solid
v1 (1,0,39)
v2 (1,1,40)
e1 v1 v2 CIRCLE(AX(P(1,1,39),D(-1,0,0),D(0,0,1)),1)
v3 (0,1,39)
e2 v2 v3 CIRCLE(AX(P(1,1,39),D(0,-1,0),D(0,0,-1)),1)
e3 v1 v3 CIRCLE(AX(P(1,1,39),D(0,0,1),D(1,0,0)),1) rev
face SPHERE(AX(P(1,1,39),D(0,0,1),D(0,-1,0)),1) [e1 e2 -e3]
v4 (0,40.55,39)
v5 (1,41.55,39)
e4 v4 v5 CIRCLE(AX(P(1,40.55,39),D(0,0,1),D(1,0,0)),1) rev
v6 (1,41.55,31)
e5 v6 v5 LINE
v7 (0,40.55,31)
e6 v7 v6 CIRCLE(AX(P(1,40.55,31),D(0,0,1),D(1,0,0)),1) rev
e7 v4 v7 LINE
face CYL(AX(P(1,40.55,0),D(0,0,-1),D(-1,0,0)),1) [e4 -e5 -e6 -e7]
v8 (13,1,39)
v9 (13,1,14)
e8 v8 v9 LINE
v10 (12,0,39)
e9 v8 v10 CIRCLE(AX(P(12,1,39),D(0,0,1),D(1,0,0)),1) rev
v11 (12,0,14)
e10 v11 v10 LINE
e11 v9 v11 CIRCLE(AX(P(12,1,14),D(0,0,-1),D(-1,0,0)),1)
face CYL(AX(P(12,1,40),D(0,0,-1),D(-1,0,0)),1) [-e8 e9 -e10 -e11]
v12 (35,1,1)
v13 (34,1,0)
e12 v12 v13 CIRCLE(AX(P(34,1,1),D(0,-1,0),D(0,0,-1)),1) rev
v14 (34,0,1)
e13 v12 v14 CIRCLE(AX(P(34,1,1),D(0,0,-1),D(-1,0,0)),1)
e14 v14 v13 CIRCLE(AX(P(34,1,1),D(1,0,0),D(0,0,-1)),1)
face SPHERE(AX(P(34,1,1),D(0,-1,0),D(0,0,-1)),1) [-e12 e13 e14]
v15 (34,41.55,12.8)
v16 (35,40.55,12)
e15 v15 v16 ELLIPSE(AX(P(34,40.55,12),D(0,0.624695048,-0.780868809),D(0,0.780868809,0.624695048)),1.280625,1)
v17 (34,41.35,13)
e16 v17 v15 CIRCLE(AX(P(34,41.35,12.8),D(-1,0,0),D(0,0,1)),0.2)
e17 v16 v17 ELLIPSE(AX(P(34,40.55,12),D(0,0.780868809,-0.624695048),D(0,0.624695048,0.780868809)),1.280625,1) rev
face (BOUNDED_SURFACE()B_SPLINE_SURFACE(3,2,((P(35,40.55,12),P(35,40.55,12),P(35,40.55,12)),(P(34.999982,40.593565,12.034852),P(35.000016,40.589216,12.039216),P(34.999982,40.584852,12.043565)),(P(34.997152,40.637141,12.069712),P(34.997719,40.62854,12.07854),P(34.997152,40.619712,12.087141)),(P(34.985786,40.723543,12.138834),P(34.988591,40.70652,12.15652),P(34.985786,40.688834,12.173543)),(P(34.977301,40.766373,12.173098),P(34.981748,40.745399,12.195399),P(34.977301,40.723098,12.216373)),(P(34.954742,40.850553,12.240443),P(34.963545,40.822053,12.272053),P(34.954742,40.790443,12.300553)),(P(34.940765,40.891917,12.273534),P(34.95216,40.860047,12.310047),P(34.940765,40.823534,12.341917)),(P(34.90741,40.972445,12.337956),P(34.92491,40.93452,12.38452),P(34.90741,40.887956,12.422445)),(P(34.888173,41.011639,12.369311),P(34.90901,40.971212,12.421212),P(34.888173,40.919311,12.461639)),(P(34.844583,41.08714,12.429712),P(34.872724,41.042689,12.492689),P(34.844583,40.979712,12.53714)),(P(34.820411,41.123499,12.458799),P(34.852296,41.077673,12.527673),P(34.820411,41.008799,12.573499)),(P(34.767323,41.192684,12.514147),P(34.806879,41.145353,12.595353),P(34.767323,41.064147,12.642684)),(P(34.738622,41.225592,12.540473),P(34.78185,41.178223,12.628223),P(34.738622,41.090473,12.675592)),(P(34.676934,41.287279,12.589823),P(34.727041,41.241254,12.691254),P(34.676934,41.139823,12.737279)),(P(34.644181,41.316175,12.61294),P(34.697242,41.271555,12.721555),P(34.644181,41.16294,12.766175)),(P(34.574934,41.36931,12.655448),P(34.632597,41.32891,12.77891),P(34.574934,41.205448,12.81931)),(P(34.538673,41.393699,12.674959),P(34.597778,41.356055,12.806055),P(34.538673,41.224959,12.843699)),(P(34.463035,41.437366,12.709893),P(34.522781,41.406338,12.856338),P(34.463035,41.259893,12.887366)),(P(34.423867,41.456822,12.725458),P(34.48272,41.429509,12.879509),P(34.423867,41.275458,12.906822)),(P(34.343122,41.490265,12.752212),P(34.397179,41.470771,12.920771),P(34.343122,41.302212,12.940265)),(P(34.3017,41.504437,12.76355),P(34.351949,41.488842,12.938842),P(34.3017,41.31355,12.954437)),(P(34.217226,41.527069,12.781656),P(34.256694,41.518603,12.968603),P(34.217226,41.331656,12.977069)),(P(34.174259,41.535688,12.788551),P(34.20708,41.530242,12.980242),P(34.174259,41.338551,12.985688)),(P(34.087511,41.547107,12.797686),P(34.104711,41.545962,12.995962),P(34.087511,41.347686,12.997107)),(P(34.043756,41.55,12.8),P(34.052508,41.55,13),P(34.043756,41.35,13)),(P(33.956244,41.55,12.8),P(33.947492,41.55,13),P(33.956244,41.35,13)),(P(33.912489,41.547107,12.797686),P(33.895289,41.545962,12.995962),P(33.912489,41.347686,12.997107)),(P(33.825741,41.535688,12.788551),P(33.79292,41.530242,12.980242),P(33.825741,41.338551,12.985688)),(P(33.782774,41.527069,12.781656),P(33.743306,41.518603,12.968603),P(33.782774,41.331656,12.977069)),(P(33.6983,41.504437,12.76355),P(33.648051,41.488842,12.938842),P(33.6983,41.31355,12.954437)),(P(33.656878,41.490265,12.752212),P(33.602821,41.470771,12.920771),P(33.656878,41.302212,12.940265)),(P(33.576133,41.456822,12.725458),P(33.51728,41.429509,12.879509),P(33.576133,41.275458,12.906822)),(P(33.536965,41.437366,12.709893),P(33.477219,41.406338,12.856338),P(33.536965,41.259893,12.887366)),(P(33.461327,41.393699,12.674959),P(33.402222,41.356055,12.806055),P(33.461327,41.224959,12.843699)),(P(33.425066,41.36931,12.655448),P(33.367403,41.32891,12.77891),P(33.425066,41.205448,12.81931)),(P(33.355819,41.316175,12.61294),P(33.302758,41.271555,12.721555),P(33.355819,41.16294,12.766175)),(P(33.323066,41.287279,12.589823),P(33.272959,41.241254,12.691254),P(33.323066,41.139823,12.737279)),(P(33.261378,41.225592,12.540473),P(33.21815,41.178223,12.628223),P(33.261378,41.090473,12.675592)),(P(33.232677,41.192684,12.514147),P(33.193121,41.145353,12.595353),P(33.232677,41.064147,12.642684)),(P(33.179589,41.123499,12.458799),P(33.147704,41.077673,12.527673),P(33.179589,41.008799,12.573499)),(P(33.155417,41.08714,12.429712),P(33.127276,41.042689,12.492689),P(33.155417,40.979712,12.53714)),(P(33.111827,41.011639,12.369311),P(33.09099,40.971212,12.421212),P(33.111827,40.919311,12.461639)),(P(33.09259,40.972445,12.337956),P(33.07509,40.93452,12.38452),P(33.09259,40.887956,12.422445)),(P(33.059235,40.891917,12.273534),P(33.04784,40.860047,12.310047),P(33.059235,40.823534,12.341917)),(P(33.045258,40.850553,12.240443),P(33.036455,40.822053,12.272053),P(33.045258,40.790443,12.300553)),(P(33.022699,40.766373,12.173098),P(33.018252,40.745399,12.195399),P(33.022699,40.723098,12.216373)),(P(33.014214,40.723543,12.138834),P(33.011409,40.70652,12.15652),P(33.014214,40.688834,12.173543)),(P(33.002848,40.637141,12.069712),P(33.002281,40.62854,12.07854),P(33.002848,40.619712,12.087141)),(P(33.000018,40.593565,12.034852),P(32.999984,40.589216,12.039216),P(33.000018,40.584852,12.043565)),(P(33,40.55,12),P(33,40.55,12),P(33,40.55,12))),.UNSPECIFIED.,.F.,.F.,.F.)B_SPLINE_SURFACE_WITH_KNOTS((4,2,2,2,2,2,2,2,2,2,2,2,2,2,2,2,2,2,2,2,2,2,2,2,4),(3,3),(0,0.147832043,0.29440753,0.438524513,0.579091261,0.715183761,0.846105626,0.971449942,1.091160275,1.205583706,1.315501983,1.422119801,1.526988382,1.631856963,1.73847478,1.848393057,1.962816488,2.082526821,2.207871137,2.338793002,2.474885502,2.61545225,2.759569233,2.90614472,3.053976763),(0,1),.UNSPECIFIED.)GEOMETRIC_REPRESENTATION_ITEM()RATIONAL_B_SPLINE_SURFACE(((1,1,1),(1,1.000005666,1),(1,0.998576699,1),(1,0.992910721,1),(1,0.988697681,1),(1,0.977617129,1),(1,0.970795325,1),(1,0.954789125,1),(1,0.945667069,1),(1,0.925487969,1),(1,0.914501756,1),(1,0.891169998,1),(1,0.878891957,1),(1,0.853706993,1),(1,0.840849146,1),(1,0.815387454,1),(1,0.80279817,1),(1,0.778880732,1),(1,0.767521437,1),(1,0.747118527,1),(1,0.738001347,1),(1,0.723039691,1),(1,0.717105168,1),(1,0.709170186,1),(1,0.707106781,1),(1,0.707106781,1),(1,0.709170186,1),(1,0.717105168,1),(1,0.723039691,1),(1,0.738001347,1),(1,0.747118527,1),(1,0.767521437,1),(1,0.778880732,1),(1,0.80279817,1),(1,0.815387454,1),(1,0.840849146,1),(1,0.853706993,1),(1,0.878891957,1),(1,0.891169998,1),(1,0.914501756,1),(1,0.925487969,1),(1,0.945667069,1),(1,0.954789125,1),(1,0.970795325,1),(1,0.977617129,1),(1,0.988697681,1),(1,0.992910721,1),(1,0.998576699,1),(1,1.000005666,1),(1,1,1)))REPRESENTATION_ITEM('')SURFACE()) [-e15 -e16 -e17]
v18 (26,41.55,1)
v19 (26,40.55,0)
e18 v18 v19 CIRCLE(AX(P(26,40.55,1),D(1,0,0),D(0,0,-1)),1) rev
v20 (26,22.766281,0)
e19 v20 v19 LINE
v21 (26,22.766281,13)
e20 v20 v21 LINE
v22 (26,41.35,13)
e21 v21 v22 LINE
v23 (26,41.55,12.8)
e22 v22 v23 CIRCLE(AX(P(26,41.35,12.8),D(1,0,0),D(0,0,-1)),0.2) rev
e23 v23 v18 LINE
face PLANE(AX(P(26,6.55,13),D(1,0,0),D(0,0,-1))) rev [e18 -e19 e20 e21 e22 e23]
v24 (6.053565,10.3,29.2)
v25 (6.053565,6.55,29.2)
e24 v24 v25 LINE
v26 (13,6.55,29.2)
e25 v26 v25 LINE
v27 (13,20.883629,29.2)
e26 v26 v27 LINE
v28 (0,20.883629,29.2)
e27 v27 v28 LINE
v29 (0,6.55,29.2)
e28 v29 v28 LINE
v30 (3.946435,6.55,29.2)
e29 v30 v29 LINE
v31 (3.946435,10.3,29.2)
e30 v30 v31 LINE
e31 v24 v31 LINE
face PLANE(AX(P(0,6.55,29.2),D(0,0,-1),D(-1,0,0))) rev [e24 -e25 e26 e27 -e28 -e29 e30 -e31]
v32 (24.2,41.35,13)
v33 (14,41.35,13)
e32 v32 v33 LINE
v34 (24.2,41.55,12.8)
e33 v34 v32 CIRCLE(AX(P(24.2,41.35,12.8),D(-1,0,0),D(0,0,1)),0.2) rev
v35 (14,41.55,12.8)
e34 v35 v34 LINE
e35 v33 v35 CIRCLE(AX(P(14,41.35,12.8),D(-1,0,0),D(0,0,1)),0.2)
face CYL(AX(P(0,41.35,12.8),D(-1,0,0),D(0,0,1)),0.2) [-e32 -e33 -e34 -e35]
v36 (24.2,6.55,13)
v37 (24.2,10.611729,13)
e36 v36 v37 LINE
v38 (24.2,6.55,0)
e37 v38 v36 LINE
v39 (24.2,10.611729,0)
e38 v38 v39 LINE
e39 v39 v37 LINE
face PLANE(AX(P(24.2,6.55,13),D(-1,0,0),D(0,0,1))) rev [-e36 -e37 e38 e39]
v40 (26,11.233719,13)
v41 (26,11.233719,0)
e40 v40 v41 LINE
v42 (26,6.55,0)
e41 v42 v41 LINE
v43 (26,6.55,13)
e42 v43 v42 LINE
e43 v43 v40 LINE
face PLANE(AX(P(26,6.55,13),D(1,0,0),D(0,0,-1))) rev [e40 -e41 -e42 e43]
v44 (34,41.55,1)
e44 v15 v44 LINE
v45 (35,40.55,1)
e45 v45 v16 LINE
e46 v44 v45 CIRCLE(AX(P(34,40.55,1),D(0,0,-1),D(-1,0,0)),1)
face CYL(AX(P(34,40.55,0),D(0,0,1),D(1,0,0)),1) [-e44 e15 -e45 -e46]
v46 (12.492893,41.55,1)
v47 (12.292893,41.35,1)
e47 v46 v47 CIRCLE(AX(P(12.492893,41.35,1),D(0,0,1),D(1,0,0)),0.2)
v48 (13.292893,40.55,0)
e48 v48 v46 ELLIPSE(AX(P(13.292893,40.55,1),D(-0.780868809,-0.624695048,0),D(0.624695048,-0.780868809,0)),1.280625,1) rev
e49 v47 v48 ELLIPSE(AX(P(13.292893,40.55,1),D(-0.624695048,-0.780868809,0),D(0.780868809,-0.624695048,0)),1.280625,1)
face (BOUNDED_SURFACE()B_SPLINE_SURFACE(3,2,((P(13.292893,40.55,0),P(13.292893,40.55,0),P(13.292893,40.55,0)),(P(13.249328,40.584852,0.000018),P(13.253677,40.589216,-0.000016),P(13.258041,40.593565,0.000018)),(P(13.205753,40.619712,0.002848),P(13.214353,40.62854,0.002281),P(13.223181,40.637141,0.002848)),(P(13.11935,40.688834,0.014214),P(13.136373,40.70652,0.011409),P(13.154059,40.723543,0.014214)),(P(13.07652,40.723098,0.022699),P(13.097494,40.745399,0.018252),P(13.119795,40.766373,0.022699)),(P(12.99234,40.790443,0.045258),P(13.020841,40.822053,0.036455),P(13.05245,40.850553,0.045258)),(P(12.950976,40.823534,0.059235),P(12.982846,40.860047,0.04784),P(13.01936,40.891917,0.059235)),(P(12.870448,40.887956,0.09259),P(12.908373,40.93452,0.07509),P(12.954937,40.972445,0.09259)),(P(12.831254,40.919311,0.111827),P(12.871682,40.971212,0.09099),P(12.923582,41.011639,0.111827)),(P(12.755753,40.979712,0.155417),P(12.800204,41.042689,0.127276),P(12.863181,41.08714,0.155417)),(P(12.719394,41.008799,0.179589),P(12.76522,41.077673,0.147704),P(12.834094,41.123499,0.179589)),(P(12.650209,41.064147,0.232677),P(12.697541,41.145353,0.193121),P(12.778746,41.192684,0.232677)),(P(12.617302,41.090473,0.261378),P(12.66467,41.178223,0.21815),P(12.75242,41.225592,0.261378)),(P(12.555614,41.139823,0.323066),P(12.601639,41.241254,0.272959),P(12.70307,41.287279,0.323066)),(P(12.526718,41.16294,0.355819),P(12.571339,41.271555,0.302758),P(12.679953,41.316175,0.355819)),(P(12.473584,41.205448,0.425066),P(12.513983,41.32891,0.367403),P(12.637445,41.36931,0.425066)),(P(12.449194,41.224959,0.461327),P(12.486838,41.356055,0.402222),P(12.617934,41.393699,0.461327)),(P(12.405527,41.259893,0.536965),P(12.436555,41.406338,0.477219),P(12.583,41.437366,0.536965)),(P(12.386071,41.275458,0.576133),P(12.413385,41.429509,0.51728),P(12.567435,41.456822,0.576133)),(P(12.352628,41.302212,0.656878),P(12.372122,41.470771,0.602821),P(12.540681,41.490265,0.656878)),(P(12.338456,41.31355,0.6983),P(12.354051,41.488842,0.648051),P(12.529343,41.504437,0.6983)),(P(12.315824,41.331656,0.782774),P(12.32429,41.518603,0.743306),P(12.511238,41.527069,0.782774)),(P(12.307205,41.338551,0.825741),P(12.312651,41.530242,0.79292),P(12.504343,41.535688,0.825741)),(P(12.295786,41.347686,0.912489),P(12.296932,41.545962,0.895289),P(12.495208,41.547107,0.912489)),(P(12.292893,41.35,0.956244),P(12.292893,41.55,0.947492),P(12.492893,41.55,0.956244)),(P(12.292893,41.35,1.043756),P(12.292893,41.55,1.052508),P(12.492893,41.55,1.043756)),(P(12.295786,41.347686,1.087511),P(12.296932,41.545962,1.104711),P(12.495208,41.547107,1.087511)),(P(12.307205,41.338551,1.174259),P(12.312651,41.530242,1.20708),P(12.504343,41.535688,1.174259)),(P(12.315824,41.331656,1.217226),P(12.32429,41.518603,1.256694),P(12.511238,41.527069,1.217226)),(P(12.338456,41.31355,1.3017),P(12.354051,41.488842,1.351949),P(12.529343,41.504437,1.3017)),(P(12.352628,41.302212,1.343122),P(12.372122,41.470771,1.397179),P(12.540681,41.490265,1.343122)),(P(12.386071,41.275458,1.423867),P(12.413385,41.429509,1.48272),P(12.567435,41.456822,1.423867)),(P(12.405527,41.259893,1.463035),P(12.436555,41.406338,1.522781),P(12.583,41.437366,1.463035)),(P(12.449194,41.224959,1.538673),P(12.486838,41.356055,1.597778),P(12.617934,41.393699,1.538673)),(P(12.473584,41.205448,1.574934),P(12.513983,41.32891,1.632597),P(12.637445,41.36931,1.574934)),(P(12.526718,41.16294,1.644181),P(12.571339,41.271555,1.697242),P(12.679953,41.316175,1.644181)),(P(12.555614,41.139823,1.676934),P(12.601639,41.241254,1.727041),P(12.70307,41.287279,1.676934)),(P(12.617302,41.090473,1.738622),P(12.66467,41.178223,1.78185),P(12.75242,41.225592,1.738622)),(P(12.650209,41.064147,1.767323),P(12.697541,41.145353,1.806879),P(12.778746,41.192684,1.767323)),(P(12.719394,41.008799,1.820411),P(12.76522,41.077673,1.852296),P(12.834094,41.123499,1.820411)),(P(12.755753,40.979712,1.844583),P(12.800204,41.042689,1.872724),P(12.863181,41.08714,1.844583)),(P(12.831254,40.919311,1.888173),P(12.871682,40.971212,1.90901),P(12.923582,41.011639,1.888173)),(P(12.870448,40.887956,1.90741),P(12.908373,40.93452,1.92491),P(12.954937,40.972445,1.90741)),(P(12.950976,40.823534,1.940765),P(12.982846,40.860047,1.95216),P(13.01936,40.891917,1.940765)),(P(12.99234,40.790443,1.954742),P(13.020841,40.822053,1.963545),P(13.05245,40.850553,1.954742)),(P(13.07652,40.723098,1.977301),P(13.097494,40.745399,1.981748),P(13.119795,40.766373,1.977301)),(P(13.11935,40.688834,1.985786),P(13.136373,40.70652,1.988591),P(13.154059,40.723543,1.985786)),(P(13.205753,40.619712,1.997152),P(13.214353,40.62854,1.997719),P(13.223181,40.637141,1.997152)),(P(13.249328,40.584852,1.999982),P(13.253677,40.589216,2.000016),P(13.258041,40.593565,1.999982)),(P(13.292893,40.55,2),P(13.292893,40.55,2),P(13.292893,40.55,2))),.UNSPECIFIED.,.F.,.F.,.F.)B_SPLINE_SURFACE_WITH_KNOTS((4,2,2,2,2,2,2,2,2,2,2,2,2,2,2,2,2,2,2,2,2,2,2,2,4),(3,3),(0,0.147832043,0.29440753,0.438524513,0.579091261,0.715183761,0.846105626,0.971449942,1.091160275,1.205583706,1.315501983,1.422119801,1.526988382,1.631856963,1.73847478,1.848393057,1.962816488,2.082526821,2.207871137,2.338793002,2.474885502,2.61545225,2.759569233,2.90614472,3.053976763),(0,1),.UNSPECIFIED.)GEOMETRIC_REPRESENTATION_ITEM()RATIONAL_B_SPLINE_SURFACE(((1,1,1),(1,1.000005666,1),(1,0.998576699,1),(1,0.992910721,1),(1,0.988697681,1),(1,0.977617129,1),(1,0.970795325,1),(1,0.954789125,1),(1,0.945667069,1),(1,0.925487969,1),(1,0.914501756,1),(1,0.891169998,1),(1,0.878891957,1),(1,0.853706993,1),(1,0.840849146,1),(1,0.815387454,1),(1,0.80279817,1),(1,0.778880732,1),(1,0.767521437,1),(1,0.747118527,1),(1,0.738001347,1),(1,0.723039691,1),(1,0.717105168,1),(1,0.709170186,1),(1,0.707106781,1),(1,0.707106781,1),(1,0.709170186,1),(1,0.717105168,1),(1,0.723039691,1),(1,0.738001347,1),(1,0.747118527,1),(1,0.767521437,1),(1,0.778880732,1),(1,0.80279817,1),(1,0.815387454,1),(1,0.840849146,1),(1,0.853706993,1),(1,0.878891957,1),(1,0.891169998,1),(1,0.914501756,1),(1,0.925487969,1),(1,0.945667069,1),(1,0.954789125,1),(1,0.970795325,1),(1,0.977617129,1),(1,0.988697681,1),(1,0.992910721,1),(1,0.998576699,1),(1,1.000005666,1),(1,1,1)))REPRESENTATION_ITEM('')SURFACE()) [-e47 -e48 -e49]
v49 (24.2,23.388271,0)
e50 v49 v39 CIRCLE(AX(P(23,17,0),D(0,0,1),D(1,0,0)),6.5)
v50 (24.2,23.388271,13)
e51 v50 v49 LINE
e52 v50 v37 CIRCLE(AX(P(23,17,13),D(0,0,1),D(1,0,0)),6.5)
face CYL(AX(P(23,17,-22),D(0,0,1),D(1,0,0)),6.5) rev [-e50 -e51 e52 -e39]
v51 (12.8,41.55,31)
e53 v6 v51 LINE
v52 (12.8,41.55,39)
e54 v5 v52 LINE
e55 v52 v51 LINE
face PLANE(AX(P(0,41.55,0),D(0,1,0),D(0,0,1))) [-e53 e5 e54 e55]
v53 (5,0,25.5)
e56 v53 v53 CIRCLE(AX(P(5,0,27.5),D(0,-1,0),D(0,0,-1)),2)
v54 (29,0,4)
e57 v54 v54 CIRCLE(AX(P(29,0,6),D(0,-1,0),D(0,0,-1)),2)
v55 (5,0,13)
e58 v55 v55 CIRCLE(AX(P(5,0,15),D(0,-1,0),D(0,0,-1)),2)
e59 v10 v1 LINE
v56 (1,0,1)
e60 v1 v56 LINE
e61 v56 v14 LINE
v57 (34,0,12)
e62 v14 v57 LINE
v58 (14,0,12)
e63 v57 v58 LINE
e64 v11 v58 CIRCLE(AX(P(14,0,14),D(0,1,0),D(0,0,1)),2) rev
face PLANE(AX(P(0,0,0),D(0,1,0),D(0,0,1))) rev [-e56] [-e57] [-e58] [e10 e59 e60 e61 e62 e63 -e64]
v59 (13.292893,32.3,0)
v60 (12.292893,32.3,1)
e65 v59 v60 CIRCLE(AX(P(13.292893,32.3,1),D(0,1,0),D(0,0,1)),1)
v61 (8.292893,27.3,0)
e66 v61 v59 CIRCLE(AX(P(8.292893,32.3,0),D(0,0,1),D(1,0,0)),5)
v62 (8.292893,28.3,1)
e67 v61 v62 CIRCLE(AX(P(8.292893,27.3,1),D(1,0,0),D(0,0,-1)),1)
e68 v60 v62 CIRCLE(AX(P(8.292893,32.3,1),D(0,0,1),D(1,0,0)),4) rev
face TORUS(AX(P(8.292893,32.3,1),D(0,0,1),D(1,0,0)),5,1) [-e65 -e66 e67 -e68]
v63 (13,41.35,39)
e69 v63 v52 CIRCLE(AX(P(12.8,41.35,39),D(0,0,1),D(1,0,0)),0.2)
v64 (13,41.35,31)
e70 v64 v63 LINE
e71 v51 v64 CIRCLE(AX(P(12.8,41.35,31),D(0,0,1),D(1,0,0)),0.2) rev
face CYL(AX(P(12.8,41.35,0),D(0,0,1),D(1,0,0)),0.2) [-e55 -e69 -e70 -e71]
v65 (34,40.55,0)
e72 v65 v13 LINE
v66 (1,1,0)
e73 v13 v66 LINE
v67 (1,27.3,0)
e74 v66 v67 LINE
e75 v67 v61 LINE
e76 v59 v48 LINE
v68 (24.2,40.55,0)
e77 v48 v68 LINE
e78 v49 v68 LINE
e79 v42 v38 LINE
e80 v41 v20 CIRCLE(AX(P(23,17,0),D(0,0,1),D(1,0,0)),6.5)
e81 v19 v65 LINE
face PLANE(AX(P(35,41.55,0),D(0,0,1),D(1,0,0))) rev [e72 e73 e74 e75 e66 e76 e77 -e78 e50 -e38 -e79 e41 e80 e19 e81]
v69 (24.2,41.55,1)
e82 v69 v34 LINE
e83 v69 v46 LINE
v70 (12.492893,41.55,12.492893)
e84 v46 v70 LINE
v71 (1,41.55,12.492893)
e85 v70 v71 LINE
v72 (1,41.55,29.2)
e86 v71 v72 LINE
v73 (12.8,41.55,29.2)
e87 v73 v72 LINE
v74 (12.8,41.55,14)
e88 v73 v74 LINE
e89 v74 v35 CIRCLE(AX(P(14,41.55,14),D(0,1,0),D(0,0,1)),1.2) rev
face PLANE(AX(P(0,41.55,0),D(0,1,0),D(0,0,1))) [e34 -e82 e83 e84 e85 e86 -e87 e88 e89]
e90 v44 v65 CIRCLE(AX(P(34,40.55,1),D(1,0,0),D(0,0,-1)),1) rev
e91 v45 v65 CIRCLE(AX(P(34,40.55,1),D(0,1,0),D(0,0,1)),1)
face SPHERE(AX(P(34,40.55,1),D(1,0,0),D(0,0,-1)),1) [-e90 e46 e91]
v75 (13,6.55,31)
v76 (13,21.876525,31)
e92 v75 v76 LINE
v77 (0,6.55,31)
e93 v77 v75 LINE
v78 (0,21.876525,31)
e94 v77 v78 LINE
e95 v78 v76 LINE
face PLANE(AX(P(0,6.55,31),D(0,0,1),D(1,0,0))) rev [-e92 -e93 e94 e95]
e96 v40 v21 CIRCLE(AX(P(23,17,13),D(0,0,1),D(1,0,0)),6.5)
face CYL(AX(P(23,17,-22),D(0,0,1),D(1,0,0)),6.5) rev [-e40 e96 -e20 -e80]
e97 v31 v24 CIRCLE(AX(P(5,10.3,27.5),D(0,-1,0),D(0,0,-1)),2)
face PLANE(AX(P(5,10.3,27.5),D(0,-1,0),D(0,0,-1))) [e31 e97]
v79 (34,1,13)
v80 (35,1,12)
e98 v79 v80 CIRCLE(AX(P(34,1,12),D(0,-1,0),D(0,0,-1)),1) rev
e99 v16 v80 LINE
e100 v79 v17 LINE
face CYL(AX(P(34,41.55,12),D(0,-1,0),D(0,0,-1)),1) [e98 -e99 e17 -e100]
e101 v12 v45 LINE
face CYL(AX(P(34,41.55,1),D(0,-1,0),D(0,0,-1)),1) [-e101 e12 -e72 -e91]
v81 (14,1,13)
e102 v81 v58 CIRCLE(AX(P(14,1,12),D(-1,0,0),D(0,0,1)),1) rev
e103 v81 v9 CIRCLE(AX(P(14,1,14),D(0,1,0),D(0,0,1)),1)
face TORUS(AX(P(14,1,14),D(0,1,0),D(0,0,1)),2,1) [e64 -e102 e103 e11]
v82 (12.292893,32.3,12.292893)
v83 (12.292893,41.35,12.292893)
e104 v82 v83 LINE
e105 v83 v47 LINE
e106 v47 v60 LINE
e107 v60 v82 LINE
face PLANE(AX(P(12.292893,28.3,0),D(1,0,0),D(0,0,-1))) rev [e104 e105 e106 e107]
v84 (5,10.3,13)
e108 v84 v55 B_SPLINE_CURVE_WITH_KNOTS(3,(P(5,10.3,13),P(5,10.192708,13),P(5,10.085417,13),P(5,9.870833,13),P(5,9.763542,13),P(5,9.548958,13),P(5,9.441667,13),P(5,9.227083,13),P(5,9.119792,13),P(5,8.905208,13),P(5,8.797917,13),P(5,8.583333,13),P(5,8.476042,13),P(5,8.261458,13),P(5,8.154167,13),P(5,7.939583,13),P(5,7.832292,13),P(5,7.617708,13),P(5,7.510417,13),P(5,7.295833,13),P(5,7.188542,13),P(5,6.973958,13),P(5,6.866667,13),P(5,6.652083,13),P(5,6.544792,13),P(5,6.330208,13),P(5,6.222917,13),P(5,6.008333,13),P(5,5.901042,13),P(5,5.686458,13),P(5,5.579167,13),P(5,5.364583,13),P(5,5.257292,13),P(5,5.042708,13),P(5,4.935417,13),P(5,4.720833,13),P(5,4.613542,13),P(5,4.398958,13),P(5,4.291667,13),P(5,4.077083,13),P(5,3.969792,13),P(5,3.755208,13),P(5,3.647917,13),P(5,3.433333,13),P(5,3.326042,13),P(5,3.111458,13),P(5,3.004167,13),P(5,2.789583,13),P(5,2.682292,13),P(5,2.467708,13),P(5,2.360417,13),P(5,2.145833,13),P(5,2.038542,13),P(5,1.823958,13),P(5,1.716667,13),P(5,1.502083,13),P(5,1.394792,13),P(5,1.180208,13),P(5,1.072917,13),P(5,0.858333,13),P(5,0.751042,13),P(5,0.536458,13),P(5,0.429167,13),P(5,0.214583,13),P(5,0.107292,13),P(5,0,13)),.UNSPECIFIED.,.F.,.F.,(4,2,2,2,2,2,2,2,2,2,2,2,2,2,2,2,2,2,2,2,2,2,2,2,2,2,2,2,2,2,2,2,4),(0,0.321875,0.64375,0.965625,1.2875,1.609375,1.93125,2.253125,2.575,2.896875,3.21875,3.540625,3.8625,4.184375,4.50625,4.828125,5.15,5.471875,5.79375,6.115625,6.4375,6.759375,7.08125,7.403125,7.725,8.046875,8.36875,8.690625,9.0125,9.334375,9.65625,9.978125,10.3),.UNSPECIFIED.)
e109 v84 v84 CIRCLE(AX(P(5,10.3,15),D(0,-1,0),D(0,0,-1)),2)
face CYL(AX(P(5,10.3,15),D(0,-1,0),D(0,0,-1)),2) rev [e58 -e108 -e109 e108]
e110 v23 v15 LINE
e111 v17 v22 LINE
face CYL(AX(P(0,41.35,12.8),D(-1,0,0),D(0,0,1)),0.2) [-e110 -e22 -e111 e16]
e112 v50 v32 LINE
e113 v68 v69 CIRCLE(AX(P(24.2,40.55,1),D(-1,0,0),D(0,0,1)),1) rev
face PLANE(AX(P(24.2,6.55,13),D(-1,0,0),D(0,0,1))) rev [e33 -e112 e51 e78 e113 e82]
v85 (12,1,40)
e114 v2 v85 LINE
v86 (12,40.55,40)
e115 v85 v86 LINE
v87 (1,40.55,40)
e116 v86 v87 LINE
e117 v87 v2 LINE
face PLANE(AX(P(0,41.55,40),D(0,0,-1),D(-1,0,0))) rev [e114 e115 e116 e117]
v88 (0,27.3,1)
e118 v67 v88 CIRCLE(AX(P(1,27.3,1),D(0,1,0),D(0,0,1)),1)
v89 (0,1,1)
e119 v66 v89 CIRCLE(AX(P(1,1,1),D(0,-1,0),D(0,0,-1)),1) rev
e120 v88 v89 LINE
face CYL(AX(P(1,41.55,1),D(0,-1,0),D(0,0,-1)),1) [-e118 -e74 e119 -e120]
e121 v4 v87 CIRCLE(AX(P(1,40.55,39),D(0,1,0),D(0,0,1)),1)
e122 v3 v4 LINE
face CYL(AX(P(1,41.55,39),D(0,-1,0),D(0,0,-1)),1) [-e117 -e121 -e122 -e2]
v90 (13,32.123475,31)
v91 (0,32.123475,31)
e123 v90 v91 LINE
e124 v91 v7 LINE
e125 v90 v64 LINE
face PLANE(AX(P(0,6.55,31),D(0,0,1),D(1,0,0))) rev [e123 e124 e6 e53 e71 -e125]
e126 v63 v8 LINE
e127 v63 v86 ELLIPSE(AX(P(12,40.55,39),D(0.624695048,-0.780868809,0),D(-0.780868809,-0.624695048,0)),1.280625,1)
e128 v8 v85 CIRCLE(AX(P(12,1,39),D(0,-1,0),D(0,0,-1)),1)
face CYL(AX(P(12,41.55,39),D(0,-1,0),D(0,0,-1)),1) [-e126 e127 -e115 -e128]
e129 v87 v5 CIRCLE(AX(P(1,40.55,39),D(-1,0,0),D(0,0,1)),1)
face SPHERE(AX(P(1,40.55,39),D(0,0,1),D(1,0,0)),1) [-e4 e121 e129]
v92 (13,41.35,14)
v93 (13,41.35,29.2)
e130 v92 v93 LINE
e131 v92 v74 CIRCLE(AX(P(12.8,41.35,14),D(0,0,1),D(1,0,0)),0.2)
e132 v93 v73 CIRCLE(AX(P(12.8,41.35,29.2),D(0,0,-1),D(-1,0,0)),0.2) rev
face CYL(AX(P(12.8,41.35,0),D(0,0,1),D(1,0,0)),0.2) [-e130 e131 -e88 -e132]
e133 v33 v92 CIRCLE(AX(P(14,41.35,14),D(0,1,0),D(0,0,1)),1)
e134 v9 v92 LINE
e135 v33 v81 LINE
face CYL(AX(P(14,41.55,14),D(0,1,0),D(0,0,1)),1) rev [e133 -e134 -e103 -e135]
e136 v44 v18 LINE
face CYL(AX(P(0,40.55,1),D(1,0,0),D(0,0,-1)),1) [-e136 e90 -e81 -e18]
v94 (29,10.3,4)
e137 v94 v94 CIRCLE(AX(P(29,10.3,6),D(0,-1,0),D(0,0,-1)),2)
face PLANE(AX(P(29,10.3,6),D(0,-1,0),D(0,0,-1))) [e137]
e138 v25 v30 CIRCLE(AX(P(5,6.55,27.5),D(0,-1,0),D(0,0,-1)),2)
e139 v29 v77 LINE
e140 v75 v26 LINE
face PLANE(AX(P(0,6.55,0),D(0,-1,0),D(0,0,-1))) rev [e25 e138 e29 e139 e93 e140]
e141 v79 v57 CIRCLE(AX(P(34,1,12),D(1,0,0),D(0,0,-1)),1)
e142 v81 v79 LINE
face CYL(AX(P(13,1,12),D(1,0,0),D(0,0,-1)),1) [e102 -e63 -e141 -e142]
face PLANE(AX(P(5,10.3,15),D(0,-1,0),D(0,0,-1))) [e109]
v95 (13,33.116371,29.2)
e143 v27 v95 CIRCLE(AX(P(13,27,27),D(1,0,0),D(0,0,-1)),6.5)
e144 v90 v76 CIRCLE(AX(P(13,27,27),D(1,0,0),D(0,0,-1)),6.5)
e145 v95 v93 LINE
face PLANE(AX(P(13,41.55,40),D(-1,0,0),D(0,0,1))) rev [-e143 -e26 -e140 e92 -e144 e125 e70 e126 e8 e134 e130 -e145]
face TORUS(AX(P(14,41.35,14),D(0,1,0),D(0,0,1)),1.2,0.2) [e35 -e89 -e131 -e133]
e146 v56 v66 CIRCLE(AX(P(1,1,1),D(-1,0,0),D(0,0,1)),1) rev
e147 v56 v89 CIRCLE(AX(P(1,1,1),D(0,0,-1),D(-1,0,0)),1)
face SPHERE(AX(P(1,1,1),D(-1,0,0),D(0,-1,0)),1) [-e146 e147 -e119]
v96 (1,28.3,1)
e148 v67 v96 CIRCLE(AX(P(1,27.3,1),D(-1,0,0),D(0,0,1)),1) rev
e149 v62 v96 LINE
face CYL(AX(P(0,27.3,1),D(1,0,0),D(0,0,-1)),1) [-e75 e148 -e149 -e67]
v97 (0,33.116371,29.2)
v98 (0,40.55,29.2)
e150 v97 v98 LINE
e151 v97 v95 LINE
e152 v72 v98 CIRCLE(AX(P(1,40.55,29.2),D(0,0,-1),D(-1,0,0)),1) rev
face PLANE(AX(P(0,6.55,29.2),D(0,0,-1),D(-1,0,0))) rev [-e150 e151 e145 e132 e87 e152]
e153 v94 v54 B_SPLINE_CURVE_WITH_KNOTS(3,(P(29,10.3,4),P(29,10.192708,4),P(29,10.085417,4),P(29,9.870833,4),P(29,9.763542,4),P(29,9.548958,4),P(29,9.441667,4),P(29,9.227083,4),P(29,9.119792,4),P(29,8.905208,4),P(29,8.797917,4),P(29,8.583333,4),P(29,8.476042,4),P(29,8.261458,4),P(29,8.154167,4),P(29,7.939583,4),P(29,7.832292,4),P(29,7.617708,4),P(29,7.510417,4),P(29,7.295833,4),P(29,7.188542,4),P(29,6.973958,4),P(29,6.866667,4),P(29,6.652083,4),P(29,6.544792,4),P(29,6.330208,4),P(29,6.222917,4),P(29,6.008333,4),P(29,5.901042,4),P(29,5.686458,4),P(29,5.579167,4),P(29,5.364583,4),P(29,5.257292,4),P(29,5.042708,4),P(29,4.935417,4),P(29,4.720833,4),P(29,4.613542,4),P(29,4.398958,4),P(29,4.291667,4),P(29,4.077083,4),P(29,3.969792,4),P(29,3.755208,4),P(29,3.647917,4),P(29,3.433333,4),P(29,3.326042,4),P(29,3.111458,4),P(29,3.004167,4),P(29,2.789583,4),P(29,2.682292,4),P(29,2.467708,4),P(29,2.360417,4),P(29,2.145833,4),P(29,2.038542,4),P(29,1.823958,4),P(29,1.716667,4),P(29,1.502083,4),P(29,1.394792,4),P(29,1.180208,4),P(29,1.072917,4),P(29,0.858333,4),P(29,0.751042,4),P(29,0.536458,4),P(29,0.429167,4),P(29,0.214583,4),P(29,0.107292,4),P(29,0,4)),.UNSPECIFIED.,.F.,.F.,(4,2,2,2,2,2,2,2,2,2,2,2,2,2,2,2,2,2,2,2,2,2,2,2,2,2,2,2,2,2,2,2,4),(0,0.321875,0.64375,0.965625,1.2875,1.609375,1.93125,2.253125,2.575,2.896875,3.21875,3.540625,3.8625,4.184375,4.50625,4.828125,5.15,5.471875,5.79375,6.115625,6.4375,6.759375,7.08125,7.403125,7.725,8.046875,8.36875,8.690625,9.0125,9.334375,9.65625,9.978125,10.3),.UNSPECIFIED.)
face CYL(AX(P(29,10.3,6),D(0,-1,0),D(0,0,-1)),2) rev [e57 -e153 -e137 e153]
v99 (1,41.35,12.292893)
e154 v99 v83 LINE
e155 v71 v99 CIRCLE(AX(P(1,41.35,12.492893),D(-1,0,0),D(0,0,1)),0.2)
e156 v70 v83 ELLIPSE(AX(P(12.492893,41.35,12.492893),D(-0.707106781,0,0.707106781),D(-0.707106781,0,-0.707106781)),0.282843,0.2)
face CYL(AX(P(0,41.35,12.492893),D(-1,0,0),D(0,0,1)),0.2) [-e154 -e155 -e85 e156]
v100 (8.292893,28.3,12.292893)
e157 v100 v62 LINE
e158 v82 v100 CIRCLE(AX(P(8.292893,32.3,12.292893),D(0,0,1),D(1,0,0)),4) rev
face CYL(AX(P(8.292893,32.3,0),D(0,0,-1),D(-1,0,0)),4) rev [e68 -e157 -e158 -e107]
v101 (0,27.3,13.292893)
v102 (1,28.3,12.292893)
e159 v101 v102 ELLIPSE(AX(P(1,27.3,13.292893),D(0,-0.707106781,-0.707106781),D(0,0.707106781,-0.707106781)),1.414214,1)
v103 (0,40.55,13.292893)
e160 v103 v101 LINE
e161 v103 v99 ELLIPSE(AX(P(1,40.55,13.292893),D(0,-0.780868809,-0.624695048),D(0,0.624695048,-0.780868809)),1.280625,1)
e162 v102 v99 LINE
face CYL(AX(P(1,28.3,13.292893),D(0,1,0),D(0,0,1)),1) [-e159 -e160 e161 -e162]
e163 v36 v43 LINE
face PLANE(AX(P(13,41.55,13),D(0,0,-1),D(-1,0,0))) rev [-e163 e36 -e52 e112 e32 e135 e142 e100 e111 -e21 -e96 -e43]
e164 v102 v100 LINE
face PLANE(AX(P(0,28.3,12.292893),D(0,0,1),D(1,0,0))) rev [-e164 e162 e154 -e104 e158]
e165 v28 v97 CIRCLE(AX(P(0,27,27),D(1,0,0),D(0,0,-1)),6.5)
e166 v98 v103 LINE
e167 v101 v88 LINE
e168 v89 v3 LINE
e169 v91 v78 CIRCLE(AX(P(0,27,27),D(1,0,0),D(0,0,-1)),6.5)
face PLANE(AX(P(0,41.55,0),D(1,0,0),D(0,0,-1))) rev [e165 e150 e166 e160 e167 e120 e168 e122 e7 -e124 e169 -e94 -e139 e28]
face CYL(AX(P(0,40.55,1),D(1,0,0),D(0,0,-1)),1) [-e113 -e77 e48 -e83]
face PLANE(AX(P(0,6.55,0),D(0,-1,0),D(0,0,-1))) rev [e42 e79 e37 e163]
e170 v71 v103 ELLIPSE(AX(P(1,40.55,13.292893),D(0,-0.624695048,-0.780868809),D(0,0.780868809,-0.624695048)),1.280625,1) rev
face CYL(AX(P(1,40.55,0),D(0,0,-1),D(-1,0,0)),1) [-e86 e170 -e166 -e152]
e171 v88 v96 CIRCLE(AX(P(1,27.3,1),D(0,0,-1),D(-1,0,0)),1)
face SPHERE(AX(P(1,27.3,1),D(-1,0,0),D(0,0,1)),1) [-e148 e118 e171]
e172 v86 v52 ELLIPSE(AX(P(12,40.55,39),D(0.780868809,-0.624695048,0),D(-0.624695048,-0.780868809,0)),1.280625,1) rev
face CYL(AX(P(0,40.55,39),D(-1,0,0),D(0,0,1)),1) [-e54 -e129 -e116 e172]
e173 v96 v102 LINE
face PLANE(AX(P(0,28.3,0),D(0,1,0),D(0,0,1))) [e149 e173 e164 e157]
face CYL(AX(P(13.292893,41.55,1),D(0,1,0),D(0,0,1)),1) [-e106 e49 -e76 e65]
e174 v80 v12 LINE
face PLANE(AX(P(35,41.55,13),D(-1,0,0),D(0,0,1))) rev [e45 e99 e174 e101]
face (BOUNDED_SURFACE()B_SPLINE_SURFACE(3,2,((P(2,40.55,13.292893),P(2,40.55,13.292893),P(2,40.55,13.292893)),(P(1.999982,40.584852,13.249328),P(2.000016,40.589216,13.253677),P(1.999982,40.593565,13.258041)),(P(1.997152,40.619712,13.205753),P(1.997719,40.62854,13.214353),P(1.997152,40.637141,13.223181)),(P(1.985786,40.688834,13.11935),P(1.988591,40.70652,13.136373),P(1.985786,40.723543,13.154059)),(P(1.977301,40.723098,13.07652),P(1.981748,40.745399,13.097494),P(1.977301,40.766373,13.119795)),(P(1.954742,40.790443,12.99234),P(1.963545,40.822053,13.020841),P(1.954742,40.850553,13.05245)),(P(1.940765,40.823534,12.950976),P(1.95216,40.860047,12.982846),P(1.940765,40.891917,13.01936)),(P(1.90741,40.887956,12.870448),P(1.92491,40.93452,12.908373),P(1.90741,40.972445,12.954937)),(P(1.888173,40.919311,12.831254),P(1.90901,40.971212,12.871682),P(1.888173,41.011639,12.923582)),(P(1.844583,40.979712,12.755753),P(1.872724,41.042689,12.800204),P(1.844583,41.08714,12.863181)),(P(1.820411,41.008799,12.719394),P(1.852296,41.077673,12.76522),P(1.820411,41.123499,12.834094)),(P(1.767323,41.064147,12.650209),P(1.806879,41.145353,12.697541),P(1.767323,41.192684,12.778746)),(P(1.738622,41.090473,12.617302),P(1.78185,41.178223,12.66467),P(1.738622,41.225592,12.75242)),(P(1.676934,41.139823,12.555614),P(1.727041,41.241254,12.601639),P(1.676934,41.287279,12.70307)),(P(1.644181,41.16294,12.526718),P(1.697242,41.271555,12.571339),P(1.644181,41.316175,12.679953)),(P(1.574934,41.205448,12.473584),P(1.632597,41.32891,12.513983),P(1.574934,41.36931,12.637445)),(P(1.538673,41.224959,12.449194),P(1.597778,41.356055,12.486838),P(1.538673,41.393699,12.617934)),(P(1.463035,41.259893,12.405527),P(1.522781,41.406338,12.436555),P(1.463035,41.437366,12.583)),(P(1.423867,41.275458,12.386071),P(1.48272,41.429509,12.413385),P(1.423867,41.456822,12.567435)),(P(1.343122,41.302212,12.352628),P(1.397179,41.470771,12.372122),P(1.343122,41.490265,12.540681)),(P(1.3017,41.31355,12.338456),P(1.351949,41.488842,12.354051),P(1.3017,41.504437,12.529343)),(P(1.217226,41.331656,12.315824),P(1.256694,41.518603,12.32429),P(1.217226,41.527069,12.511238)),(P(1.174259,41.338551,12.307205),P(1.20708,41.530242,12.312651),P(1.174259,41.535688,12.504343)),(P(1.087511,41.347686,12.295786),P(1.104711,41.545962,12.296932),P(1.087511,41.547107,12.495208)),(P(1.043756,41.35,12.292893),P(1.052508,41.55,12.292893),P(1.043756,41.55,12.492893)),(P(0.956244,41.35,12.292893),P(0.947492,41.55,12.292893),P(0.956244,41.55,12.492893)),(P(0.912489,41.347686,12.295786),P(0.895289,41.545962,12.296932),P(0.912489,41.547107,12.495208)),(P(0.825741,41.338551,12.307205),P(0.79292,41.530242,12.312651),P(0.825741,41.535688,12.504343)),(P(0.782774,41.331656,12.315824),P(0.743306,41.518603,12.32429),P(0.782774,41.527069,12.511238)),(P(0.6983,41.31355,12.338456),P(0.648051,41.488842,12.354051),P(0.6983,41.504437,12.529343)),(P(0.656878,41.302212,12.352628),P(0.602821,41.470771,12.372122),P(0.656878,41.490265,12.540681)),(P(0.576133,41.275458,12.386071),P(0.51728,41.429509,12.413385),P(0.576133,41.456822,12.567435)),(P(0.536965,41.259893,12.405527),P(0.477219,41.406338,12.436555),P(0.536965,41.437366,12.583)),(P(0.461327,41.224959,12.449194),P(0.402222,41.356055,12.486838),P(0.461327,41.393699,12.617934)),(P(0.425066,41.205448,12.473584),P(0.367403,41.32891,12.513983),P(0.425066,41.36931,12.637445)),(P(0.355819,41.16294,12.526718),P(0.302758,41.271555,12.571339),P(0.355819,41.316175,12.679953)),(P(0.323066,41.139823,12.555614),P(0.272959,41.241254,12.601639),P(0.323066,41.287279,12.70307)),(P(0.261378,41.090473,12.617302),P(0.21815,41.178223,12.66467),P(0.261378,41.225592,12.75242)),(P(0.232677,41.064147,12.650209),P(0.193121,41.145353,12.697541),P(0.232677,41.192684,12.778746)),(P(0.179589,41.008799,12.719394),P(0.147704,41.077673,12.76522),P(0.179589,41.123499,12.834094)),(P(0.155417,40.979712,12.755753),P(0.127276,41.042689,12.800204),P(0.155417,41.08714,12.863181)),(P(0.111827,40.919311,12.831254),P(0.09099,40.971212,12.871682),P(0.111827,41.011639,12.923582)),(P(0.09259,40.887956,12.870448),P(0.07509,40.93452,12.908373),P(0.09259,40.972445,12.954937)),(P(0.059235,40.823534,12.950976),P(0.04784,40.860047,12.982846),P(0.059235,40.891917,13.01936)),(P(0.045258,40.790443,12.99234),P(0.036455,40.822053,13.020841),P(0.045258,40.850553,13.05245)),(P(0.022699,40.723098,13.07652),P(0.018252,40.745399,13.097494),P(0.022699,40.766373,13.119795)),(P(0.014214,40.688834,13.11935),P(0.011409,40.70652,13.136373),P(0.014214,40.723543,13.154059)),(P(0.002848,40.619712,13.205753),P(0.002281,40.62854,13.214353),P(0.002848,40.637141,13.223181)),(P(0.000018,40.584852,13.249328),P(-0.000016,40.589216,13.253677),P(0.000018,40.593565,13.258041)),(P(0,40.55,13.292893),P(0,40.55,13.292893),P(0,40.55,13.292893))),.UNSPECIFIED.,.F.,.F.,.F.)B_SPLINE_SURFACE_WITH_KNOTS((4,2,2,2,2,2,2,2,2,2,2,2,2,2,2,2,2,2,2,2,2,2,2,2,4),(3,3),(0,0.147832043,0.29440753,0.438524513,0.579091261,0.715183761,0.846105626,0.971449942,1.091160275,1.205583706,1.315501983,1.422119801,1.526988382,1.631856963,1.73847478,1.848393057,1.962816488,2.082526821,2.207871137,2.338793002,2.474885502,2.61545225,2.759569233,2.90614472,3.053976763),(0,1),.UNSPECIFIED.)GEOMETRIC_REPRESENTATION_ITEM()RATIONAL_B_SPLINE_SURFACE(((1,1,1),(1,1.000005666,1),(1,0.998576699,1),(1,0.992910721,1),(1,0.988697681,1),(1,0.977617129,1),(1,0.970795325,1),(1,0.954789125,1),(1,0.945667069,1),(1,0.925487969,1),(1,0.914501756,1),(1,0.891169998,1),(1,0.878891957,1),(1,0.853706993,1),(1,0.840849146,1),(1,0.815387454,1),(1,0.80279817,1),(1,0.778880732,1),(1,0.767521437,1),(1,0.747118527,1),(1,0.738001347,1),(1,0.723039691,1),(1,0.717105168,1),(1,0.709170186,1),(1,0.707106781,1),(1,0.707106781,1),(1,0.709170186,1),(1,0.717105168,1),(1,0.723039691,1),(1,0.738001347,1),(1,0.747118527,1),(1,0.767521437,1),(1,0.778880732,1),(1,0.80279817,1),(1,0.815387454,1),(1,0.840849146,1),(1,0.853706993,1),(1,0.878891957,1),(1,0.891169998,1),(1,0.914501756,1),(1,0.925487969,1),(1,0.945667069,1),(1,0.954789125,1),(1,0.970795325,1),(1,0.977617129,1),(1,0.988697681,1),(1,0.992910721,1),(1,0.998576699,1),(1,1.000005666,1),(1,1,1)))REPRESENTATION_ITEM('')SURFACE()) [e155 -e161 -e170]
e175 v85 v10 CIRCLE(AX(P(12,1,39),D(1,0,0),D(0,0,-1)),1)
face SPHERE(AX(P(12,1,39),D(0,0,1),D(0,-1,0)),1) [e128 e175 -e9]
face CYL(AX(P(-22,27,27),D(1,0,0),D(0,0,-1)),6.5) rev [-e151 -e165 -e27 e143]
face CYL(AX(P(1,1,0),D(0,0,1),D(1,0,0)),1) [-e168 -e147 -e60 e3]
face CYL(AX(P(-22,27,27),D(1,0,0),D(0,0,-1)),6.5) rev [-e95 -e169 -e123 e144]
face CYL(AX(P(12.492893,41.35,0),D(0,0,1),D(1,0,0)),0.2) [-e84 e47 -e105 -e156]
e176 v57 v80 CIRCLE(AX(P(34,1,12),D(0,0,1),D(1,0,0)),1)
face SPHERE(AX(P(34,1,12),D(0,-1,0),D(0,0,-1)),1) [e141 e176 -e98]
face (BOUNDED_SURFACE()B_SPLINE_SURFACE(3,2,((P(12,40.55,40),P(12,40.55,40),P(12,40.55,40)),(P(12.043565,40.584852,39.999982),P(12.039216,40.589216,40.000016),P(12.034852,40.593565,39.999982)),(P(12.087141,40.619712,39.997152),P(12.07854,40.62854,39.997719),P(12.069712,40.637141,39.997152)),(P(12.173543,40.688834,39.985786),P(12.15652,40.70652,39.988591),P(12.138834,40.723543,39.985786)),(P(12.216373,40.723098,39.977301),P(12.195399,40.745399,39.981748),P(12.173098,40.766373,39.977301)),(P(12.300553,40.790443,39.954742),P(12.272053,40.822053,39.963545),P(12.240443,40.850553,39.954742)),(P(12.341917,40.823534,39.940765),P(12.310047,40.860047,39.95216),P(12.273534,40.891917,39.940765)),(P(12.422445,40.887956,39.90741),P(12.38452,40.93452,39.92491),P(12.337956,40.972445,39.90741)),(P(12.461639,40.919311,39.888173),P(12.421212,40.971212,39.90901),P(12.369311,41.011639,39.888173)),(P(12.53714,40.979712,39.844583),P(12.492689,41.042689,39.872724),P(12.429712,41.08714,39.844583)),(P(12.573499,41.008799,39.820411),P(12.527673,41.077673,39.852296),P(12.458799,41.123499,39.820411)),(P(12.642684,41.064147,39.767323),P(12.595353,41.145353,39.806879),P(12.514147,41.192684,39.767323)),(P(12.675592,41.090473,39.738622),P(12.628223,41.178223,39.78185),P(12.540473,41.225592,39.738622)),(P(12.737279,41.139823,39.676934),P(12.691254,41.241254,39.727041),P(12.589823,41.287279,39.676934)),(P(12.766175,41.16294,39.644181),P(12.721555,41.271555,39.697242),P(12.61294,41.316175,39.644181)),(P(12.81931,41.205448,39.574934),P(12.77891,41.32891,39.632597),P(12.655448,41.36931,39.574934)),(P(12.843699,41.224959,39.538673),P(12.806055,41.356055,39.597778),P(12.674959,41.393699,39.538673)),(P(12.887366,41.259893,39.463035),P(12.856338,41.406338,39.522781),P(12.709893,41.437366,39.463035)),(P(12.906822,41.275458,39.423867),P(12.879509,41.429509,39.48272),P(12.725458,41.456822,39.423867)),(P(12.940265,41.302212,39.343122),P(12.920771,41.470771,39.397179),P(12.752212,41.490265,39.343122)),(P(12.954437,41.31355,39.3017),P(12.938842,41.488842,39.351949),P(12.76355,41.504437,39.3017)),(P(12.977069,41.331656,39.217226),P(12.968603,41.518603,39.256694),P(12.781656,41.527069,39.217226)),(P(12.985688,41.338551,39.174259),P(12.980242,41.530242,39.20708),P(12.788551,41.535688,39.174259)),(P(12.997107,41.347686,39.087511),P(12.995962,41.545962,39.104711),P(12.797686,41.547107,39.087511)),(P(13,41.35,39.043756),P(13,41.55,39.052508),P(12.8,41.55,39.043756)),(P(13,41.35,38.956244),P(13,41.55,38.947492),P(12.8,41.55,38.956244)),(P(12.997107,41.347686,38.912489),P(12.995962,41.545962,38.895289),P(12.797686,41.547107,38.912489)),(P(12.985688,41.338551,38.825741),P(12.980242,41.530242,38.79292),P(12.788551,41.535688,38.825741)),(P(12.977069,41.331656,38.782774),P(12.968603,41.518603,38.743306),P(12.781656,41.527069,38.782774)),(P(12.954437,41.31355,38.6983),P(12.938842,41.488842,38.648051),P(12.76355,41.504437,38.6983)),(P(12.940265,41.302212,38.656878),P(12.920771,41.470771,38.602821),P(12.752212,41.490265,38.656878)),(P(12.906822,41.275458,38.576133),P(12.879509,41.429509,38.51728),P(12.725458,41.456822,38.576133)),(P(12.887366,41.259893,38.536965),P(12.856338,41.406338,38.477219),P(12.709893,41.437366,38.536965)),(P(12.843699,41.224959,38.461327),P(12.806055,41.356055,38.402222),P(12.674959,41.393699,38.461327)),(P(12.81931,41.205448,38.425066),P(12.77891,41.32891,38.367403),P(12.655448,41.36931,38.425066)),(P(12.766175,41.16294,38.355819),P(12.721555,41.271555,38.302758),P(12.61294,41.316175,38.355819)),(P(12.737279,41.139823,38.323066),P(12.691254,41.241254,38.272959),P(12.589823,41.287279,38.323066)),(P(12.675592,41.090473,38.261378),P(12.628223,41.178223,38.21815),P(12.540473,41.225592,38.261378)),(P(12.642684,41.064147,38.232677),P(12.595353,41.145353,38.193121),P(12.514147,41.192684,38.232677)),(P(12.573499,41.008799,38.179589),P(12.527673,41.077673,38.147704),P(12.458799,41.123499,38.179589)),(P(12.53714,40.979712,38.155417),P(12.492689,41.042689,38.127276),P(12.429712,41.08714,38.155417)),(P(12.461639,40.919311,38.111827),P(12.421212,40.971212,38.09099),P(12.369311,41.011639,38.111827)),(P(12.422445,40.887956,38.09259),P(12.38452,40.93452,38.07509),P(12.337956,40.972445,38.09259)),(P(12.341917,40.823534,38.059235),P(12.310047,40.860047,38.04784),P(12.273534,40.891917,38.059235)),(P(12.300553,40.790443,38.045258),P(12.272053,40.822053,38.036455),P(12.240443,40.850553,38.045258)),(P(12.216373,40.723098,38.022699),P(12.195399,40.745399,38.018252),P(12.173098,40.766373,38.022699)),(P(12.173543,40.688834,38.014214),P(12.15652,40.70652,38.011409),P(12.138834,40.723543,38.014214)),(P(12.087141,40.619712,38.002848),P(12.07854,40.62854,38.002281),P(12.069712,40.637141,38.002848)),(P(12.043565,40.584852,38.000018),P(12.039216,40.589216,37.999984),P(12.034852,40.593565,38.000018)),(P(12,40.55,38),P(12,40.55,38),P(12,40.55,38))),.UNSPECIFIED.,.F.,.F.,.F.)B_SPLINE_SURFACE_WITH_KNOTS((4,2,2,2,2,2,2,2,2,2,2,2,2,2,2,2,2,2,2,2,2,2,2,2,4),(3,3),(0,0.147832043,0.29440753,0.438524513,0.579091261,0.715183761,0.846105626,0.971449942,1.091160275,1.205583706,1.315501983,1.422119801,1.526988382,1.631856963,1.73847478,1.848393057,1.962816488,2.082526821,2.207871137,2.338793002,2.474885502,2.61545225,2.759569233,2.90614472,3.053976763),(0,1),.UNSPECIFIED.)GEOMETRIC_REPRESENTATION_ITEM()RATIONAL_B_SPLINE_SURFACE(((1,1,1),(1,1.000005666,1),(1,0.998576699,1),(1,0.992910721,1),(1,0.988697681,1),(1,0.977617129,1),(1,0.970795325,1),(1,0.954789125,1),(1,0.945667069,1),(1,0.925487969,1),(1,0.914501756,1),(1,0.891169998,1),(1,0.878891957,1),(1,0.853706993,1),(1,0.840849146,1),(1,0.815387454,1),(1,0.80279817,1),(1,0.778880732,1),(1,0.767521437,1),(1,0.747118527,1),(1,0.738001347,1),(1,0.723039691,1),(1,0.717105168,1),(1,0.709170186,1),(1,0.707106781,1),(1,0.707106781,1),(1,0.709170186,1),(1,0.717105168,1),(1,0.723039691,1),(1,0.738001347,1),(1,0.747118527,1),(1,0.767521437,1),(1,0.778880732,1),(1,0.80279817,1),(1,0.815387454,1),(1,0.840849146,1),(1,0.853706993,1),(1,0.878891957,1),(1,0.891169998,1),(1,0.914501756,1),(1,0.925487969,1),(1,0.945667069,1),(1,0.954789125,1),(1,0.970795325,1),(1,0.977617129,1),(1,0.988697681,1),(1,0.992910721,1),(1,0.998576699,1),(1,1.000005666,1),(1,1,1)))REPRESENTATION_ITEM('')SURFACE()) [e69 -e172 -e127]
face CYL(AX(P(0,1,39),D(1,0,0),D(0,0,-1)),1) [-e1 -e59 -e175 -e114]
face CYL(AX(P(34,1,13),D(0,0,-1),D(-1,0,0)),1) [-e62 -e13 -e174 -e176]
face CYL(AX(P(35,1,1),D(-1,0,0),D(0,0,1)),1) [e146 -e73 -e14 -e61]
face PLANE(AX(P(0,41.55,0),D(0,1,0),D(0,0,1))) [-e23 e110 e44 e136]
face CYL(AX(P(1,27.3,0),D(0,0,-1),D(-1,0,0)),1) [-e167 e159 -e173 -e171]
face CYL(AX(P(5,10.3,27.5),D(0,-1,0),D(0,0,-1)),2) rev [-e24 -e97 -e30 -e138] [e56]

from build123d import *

# Parameters (mm, degrees)
BOSS_EXTRUDE1_DEPTH = 41.55
SKETCH2_W           = 12.292893219
SKETCH2_H           = 12.292893219
CUT_EXTRUDE1_DEPTH  = 13.25
FILLET1_R           = 4
FILLET2_R           = 1
FILLET3_R           = 0.2
SKETCH3_W           = 13
SKETCH3_H           = 1.8
SKETCH3_W_2         = 1.8
SKETCH3_H_2         = 13
CUT_EXTRUDE2_DEPTH  = 35
SKETCH4_R           = 6.5
CUT_EXTRUDE3_DEPTH  = 35
SKETCH5_R           = 6.5
CUT_EXTRUDE4_DEPTH  = 35
SKETCH6_R           = 2
CUT_EXTRUDE5_DEPTH  = 10.3


with BuildPart() as part:
    # Sketch1 → Boss-Extrude1 (new body)
    with BuildSketch(Plane(origin=(0, 0, 0), x_dir=(1, 0, 0), z_dir=(0, 1, 0))):
        Polygon((0, 0), (0, -40), (13, -40), (13, -13), (35, -13), (35, 0), align=None)
    extrude(amount=BOSS_EXTRUDE1_DEPTH)

    # Sketch2 → Cut-Extrude1 (cut)
    with BuildSketch(Plane(origin=(0, 41.55, 0), x_dir=(1, 0, 0), z_dir=(0, 1, 0))):
        with Locations((6.14644661, -6.14644661)):
            Rectangle(SKETCH2_W, SKETCH2_H)
    extrude(amount=-CUT_EXTRUDE1_DEPTH, mode=Mode.SUBTRACT)

    # Fillet1
    fillet1_edges = [part.edges().sort_by_distance(p)[0] for p in [
        (12.292893219, 28.3, 6.146446609),
    ]]
    fillet(fillet1_edges, radius=FILLET1_R)

    # Fillet2
    fillet2_edges = [part.edges().sort_by_distance(p)[0] for p in [
        (23.646446609, 41.55, 0),
        (12.292893219, 36.925, 0),
        (11.121320344, 29.471572875, 0),
        (4.146446609, 28.3, 0),
        (0, 14.15, 0),
        (0, 28.3, 6.146446609),
        (0, 34.925, 12.292893219),
        (0, 41.55, 26.146446609),
        (0, 0, 20),
        (17.5, 0, 0),
        (35, 41.55, 6.5),
        (35, 20.775, 0),
        (35, 0, 6.5),
        (13, 0, 26.5),
        (13, 20.775, 13),
        (35, 20.775, 13),
        (24, 0, 13),
        (0, 20.775, 40),
        (6.5, 41.55, 40),
        (13, 20.775, 40),
        (6.5, 0, 40),
    ]]
    fillet(fillet2_edges, radius=FILLET2_R)

    # Fillet3
    fillet3_edges = [part.edges().sort_by_distance(p)[0] for p in [
        (0.236703983, 41.196048907, 12.646844311),
        (12.646844311, 41.196048907, 0.236703983),
        (6.646446609, 41.55, 12.292893219),
        (12.292893219, 41.55, 6.646446609),
        (12.646048907, 41.196048907, 39.763296017),
        (34.763296017, 41.196048907, 12.646048907),
        (24, 41.55, 13),
        (13.292893219, 41.55, 13.292893219),
        (13, 41.55, 26.5),
    ]]
    fillet(fillet3_edges, radius=FILLET3_R)

    # Sketch3 → Cut-Extrude2 (cut)
    with BuildSketch(Plane(origin=(0, 41.55, 0), x_dir=(1, 0, 0), z_dir=(0, 1, 0))):
        with Locations((6.5, -30.1)):
            Rectangle(SKETCH3_W, SKETCH3_H)
        with Locations((25.1, -6.5)):
            Rectangle(SKETCH3_W_2, SKETCH3_H_2)
    extrude(amount=-CUT_EXTRUDE2_DEPTH, mode=Mode.SUBTRACT)

    # Sketch4 → Cut-Extrude3 (cut)
    with BuildSketch(Plane.XY.offset(13)):
        with Locations((23, 17)):
            Circle(SKETCH4_R)
    extrude(amount=-CUT_EXTRUDE3_DEPTH, mode=Mode.SUBTRACT)

    # Sketch5 → Cut-Extrude4 (cut)
    with BuildSketch(Plane(origin=(13, 0, 0), x_dir=(0, 0, -1), z_dir=(1, 0, 0))):
        with Locations((-27, 27)):
            Circle(SKETCH5_R)
    extrude(amount=-CUT_EXTRUDE4_DEPTH, mode=Mode.SUBTRACT)

    # Sketch6 → Cut-Extrude5 (cut)
    with BuildSketch(Plane.XZ):
        with Locations((5, 27.5)):
            Circle(SKETCH6_R)
        with Locations((5, 15)):
            Circle(SKETCH6_R)
        with Locations((29, 6)):
            Circle(SKETCH6_R)
    extrude(amount=-CUT_EXTRUDE5_DEPTH, mode=Mode.SUBTRACT)


solid = part.part
